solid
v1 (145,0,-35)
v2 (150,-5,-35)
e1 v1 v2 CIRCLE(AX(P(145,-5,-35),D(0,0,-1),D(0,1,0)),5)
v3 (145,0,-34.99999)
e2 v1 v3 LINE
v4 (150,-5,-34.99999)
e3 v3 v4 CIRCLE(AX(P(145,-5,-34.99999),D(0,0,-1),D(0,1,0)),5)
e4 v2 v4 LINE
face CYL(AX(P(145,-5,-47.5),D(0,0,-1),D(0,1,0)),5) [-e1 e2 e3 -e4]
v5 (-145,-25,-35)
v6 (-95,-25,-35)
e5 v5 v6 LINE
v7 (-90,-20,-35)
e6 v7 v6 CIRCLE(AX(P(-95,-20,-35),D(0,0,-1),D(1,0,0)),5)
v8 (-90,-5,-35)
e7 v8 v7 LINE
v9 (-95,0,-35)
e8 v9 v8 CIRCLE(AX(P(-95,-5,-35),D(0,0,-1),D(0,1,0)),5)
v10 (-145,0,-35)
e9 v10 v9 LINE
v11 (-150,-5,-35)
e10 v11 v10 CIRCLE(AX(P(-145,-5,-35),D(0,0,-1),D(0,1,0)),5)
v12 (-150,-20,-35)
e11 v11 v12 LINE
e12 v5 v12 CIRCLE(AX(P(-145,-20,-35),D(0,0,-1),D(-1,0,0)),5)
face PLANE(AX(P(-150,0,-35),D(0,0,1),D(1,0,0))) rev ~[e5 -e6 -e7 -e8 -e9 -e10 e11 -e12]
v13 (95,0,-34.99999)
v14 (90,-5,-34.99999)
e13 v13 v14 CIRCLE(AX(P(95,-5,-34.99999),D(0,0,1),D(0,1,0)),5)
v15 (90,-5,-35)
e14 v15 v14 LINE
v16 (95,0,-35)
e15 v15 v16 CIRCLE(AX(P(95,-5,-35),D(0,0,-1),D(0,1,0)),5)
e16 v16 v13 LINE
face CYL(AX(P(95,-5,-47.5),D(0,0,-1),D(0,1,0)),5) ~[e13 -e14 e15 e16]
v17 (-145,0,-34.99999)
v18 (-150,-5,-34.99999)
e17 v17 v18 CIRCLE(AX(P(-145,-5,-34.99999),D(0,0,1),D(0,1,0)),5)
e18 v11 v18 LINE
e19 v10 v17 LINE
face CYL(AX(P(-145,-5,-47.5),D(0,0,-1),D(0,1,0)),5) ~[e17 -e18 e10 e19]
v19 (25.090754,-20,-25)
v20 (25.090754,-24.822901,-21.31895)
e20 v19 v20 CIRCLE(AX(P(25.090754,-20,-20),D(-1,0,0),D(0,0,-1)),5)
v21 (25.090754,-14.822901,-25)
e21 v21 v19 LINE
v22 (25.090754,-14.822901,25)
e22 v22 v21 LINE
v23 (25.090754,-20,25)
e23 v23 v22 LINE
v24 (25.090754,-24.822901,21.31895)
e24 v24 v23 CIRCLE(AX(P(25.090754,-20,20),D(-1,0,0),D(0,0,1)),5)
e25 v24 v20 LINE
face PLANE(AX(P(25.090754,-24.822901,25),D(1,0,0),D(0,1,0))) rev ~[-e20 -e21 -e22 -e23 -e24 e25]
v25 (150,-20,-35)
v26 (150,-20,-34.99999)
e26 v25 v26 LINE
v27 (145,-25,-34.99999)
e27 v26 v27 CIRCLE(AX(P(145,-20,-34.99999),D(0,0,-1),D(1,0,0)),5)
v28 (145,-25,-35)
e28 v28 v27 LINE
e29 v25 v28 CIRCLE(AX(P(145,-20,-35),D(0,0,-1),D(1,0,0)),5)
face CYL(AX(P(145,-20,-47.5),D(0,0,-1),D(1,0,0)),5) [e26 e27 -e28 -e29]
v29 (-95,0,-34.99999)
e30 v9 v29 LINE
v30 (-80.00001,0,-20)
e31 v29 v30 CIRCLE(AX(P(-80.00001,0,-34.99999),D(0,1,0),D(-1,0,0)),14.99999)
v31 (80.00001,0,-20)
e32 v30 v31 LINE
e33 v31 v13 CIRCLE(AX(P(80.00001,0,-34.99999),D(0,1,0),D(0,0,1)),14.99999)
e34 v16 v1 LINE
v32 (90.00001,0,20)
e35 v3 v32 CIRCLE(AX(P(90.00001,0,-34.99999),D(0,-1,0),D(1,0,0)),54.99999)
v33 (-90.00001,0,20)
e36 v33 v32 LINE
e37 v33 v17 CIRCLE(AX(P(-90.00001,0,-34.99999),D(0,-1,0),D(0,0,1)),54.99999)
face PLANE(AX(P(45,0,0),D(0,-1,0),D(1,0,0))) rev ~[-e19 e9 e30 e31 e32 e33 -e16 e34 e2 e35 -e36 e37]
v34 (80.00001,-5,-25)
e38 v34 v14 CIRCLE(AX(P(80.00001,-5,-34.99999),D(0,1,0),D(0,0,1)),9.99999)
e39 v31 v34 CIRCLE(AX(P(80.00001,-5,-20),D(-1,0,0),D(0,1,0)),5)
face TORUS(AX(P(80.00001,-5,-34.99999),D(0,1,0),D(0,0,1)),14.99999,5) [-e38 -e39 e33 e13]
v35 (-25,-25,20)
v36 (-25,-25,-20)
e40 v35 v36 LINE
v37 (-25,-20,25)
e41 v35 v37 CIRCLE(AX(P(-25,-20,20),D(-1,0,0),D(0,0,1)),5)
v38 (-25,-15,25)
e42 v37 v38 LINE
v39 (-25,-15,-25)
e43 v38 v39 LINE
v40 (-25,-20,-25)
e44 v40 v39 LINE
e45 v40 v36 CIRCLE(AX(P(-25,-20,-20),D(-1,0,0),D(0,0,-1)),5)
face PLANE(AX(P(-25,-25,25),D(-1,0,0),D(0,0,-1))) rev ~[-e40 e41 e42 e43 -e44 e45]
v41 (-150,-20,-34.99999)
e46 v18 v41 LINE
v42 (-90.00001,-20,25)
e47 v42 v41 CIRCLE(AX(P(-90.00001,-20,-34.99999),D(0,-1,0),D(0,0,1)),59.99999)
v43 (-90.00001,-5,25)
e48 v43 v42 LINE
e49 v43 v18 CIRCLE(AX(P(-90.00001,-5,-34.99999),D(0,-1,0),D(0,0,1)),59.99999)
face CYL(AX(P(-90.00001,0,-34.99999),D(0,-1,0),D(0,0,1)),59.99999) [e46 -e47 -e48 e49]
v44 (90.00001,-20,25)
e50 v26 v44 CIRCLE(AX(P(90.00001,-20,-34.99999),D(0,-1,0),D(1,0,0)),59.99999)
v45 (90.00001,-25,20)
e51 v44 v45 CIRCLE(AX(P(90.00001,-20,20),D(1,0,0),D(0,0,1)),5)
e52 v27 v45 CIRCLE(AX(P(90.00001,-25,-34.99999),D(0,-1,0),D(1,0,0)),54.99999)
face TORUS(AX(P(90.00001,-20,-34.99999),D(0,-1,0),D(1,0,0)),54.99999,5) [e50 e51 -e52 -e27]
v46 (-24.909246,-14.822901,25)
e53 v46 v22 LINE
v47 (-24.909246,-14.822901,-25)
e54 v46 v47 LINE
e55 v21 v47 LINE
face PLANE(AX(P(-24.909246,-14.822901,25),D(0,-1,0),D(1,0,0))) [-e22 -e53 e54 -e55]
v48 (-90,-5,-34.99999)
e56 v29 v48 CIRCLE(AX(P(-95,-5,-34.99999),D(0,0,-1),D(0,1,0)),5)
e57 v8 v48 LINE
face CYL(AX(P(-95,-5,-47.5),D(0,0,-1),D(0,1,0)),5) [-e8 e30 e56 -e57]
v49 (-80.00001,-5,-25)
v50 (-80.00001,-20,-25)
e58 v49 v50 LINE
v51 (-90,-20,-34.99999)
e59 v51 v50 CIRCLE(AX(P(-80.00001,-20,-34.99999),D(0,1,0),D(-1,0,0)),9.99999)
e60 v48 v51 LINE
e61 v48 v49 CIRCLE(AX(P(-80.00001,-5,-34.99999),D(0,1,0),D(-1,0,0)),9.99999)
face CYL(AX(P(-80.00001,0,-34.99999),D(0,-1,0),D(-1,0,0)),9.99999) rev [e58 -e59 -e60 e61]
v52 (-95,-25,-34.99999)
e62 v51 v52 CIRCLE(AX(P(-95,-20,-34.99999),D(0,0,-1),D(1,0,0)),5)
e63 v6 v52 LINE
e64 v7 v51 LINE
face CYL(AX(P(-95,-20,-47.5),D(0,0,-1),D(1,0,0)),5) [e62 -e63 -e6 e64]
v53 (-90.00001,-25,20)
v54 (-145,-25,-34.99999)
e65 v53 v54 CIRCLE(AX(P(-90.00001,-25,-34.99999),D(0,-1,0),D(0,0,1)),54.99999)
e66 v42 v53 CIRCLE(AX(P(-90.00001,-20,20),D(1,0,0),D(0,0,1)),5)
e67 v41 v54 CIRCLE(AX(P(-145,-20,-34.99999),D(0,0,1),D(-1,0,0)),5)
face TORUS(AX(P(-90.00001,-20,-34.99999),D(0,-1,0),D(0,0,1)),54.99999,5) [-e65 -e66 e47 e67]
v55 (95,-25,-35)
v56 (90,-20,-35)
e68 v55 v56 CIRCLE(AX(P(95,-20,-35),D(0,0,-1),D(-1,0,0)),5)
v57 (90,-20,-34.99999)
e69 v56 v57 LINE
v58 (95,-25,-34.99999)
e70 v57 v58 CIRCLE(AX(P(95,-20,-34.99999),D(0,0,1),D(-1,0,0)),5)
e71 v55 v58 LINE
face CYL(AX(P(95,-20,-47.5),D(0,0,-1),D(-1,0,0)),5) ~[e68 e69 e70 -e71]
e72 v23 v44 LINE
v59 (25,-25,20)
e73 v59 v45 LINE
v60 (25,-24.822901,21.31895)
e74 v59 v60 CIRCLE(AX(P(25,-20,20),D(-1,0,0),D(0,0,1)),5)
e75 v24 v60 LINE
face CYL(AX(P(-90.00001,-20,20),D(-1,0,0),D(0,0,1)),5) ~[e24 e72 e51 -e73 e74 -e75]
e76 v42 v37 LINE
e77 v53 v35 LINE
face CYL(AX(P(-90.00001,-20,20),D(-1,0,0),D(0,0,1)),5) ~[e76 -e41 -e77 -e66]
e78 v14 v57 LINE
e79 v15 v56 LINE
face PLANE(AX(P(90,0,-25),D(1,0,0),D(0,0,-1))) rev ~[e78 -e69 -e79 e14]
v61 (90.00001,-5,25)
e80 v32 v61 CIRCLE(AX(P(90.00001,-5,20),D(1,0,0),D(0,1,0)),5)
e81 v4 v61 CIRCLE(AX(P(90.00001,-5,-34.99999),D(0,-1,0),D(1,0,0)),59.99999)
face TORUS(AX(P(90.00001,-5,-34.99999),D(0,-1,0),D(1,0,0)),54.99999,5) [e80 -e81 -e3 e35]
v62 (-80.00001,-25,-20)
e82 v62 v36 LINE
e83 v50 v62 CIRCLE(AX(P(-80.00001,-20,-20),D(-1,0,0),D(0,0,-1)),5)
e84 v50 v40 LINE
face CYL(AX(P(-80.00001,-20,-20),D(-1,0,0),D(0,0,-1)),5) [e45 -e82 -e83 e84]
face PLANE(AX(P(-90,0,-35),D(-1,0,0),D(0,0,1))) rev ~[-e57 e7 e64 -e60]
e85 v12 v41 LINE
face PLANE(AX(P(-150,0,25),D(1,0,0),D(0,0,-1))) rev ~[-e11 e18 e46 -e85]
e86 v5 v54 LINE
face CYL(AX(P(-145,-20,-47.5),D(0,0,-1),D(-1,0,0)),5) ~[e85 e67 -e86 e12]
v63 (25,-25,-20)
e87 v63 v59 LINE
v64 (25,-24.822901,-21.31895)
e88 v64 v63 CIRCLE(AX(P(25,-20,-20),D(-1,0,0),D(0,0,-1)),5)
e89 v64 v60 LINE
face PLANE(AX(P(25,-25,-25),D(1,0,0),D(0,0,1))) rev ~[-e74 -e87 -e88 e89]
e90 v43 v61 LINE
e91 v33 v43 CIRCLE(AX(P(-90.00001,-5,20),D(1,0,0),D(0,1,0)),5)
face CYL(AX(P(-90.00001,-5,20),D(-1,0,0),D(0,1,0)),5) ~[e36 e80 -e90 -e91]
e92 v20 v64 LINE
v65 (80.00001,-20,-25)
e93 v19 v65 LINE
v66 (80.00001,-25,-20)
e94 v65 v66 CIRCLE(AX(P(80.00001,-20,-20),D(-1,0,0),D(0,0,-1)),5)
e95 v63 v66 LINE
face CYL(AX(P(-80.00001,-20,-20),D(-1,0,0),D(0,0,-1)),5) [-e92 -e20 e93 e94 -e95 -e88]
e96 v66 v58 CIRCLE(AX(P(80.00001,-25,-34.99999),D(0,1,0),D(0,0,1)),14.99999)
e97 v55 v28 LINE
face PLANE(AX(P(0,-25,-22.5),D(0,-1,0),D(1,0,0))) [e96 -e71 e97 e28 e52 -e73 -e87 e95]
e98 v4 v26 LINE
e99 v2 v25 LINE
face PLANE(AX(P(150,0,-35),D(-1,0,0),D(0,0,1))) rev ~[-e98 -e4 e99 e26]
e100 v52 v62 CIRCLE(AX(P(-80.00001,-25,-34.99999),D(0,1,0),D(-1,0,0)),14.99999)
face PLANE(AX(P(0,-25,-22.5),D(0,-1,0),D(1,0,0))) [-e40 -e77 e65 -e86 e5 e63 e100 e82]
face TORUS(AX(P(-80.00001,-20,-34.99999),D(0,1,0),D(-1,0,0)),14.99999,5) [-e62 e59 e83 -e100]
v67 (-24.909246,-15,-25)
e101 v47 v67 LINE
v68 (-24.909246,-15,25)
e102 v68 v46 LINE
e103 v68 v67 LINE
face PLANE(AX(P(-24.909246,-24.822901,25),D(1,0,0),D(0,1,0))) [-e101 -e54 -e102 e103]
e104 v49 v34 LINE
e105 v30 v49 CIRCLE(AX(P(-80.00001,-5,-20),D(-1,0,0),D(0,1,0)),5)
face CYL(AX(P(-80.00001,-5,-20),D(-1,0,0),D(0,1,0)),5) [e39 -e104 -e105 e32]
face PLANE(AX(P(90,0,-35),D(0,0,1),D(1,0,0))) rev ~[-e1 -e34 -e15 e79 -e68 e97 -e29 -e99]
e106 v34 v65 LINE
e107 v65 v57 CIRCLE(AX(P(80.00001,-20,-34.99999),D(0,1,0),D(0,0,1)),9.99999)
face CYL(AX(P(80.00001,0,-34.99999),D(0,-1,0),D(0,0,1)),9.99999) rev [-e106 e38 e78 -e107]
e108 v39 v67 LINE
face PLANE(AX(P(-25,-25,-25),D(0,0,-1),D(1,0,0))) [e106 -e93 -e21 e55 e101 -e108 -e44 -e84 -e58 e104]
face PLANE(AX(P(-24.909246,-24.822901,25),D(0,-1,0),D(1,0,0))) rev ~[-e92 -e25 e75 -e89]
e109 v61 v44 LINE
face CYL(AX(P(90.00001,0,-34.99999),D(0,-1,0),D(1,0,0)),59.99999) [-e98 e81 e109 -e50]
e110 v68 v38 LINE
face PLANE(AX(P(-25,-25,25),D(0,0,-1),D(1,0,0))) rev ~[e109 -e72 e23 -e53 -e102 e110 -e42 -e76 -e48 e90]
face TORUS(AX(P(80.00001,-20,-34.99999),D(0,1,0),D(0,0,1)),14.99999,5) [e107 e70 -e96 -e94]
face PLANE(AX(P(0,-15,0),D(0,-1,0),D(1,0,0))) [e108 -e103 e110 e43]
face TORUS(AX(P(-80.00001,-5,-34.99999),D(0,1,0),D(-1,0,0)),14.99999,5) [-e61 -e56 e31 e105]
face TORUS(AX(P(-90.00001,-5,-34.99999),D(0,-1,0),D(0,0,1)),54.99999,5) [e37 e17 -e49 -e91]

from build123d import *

# Parameters (mm, degrees)
F0_W         = 90
F0_H         = 50
F1_DEPTH     = 25
F2_R         = 59.99999
F3_R         = 9.99999
F4_R         = 9.99999
F5_R         = 59.99999
F6_T1_DEPTH  = 12.50001
F6_T3_DEPTH  = 180.00002
F6_T6_ANGLE  = 90
F6_T8_ANGLE  = 90
F7_T1_DEPTH  = 12.50001
F7_T3_DEPTH  = 180.00002
F7_T6_ANGLE  = 90
F7_T8_ANGLE  = 90
F8_T1_DEPTH  = 160.00002
F8_T3_DEPTH  = 12.50001
F8_T6_ANGLE  = 90
F8_T8_ANGLE  = 90
F8_T10_ANGLE = 90
F8_T12_ANGLE = 90
F9_W         = 50
F9_H         = 5
F9_H_2       = 40
F10_DEPTH    = 10
F13_W        = 50
F13_H        = 10
F14_DEPTH    = 60.001
F16_DEPTH    = 10


# Not quite as in the source:
# - a fillet or chamfer that OpenCascade refuses, or shapes differently, is made with other operations: its cross-section is extruded or revolved along the edge and cut away or added
# - a fillet or chamfer is up to 0.001 mm smaller than in the source, because OpenCascade refuses the exact size


with BuildPart() as f1:
    # F0 (on Front) → F1 (new body)
    with BuildSketch(Plane.XZ):
        with Locations((45, 0)):
            Rectangle(F0_W, F0_H)
        Polygon((150, 25), (90, 25), (90, -25), (90, -35), (150, -35), align=None)
        with Locations((-45, 0)):
            Rectangle(F0_W, F0_H)
        Polygon((-90, -25), (-90, 25), (-150, 25), (-150, -35), (-90, -35), align=None)
    extrude(amount=F1_DEPTH)

    # F2 (radius 60 in the source; OpenCascade refuses exactly that, so slightly less here)
    f2_edges = [f1.edges().sort_by_distance(p)[0] for p in [
        (-150, -12.5, 25),
    ]]
    fillet(f2_edges, radius=F2_R)

    # F3 (radius 10 in the source; OpenCascade refuses exactly that, so slightly less here)
    f3_edges = [f1.edges().sort_by_distance(p)[0] for p in [
        (-90, -12.5, -25),
    ]]
    fillet(f3_edges, radius=F3_R)

    # F4 (radius 10 in the source; OpenCascade refuses exactly that, so slightly less here)
    f4_edges = [f1.edges().sort_by_distance(p)[0] for p in [
        (90, -12.5, -25),
    ]]
    fillet(f4_edges, radius=F4_R)

    # F5 (radius 60 in the source; OpenCascade refuses exactly that, so slightly less here)
    f5_edges = [f1.edges().sort_by_distance(p)[0] for p in [
        (150, -12.5, 25),
    ]]
    fillet(f5_edges, radius=F5_R)

    # F6: fillet of radius 5 on 1 edges, made by hand

    # F6_s2 → F6_t1 (cut)
    with BuildSketch(Plane.XY.offset(-47.5)):
        with BuildLine():
            ThreePointArc((150, -20), (148.5355339059, -23.5355339059), (145, -25))
            Line((145, -25), (150, -25))
            Line((150, -25), (150, -20))
        make_face()
        with BuildLine():
            ThreePointArc((-150, -20), (-148.5355339059, -23.5355339059), (-145, -25))
            Line((-145, -25), (-150, -25))
            Line((-150, -25), (-150, -20))
        make_face()
    extrude(amount=F6_T1_DEPTH, mode=Mode.SUBTRACT)

    # F6_s4 → F6_t3 (cut)
    with BuildSketch(Plane.YZ.offset(-90.00001)):
        with BuildLine():
            ThreePointArc((-20, 25), (-23.5355339059, 23.5355339059), (-25, 20))
            Line((-25, 20), (-25, 25))
            Line((-25, 25), (-20, 25))
        make_face()
    extrude(amount=F6_T3_DEPTH, mode=Mode.SUBTRACT)

    # F6_s5 → F6_t6 (revolve, cut)
    with BuildSketch(Plane.XY.offset(-34.99999)):
        with BuildLine():
            ThreePointArc((150, -20), (148.5355339059, -23.5355339059), (145, -25))
            Line((145, -25), (150, -25))
            Line((150, -25), (150, -20))
        make_face()
    revolve(axis=Axis((90.00001, -25, -34.99999), (0, -1, 0)), revolution_arc=F6_T6_ANGLE, mode=Mode.SUBTRACT)

    # F6_s7 → F6_t8 (revolve, cut)
    with BuildSketch(Plane.YZ.offset(-90.00001)):
        with BuildLine():
            ThreePointArc((-20, 25), (-23.5355339059, 23.5355339059), (-25, 20))
            Line((-25, 20), (-25, 25))
            Line((-25, 25), (-20, 25))
        make_face()
    revolve(axis=Axis((-90.00001, -25, -34.99999), (0, -1, 0)), revolution_arc=F6_T8_ANGLE, mode=Mode.SUBTRACT)

    # F7: fillet of radius 5 on 1 edges, made by hand

    # F7_s2 → F7_t1 (cut)
    with BuildSketch(Plane.XY.offset(-47.5)):
        with BuildLine():
            ThreePointArc((145, 0), (148.5355339059, -1.4644660941), (150, -5))
            Line((150, -5), (150, 0))
            Line((150, 0), (145, 0))
        make_face()
        with BuildLine():
            ThreePointArc((-145, 0), (-148.5355339059, -1.4644660941), (-150, -5))
            Line((-150, -5), (-150, 0))
            Line((-150, 0), (-145, 0))
        make_face()
    extrude(amount=F7_T1_DEPTH, mode=Mode.SUBTRACT)

    # F7_s4 → F7_t3 (cut)
    with BuildSketch(Plane.YZ.offset(-90.00001)):
        with BuildLine():
            ThreePointArc((0, 20), (-1.4644660941, 23.5355339059), (-5, 25))
            Line((-5, 25), (0, 25))
            Line((0, 25), (0, 20))
        make_face()
    extrude(amount=F7_T3_DEPTH, mode=Mode.SUBTRACT)

    # F7_s5 → F7_t6 (revolve, cut)
    with BuildSketch(Plane.XY.offset(-34.99999)):
        with BuildLine():
            ThreePointArc((145, 0), (148.5355339059, -1.4644660941), (150, -5))
            Line((150, -5), (150, 0))
            Line((150, 0), (145, 0))
        make_face()
    revolve(axis=Axis((90.00001, 0, -34.99999), (0, -1, 0)), revolution_arc=F7_T6_ANGLE, mode=Mode.SUBTRACT)

    # F7_s7 → F7_t8 (revolve, cut)
    with BuildSketch(Plane.YZ.offset(-90.00001)):
        with BuildLine():
            ThreePointArc((0, 20), (-1.4644660941, 23.5355339059), (-5, 25))
            Line((-5, 25), (0, 25))
            Line((0, 25), (0, 20))
        make_face()
    revolve(axis=Axis((-90.00001, 0, -34.99999), (0, -1, 0)), revolution_arc=F7_T8_ANGLE, mode=Mode.SUBTRACT)

    # F8: fillet of radius 5 on 2 edges, made by hand

    # F8_s2 → F8_t1 (cut)
    with BuildSketch(Plane.YZ.offset(-80.00001)):
        with BuildLine():
            ThreePointArc((-20, -25), (-23.5355339059, -23.5355339059), (-25, -20))
            Line((-25, -20), (-25, -25))
            Line((-25, -25), (-20, -25))
        make_face()
        with BuildLine():
            ThreePointArc((0, -20), (-1.4644660941, -23.5355339059), (-5, -25))
            Line((-5, -25), (0, -25))
            Line((0, -25), (0, -20))
        make_face()
    extrude(amount=F8_T1_DEPTH, mode=Mode.SUBTRACT)

    # F8_s4 → F8_t3 (cut)
    with BuildSketch(Plane.XY.offset(-47.5)):
        with BuildLine():
            ThreePointArc((90, -20), (91.4644660941, -23.5355339059), (95, -25))
            Line((95, -25), (90, -25))
            Line((90, -25), (90, -20))
        make_face()
        with BuildLine():
            ThreePointArc((-90, -20), (-91.4644660941, -23.5355339059), (-95, -25))
            Line((-95, -25), (-90, -25))
            Line((-90, -25), (-90, -20))
        make_face()
        with BuildLine():
            ThreePointArc((95, 0), (91.4644660941, -1.4644660941), (90, -5))
            Line((90, -5), (90, 0))
            Line((90, 0), (95, 0))
        make_face()
        with BuildLine():
            ThreePointArc((-95, 0), (-91.4644660941, -1.4644660941), (-90, -5))
            Line((-90, -5), (-90, 0))
            Line((-90, 0), (-95, 0))
        make_face()
    extrude(amount=F8_T3_DEPTH, mode=Mode.SUBTRACT)

    # F8_s5 → F8_t6 (revolve, cut)
    with BuildSketch(Plane.YZ.offset(80.00001)):
        with BuildLine():
            ThreePointArc((0, -20), (-1.4644660941, -23.5355339059), (-5, -25))
            Line((-5, -25), (0, -25))
            Line((0, -25), (0, -20))
        make_face()
    revolve(axis=Axis((80.00001, 0, -34.99999), (0, 1, 0)), revolution_arc=F8_T6_ANGLE, mode=Mode.SUBTRACT)

    # F8_s7 → F8_t8 (revolve, cut)
    with BuildSketch(Plane.XY.offset(-34.99999)):
        with BuildLine():
            ThreePointArc((-90, -20), (-91.4644660941, -23.5355339059), (-95, -25))
            Line((-95, -25), (-90, -25))
            Line((-90, -25), (-90, -20))
        make_face()
    revolve(axis=Axis((-80.00001, -25, -34.99999), (0, 1, 0)), revolution_arc=F8_T8_ANGLE, mode=Mode.SUBTRACT)

    # F8_s9 → F8_t10 (revolve, cut)
    with BuildSketch(Plane.YZ.offset(80.00001)):
        with BuildLine():
            ThreePointArc((-20, -25), (-23.5355339059, -23.5355339059), (-25, -20))
            Line((-25, -20), (-25, -25))
            Line((-25, -25), (-20, -25))
        make_face()
    revolve(axis=Axis((80.00001, -25, -34.99999), (0, 1, 0)), revolution_arc=F8_T10_ANGLE, mode=Mode.SUBTRACT)

    # F8_s11 → F8_t12 (revolve, cut)
    with BuildSketch(Plane.XY.offset(-34.99999)):
        with BuildLine():
            ThreePointArc((-95, 0), (-91.4644660941, -1.4644660941), (-90, -5))
            Line((-90, -5), (-90, 0))
            Line((-90, 0), (-95, 0))
        make_face()
    revolve(axis=Axis((-80.00001, 0, -34.99999), (0, 1, 0)), revolution_arc=F8_T12_ANGLE, mode=Mode.SUBTRACT)

    # F9 (on face) → F10 (join)
    with BuildSketch(Plane.XZ.offset(25)):
        with Locations((0, -22.5)):
            Rectangle(F9_W, F9_H)
        with Locations((0, 22.5)):
            Rectangle(F9_W, F9_H)
        Rectangle(F9_W, F9_H_2)
    extrude(amount=-F10_DEPTH)

    # F13 (on face) → F14 (cut, through all)
    with BuildSketch(Plane.XY.offset(25)):
        with Locations((0.0907536596, -19.8229007973)):
            Rectangle(F13_W, F13_H)
    extrude(amount=-F14_DEPTH, mode=Mode.SUBTRACT)

    # F15 (on face) → F16 (cut)
    with BuildSketch(Plane.XZ.offset(25)):
        Polygon((25, 25), (-25, 25), (-25, 20), (-25, -20), (-25, -25), (25, -25), (25, -20), (25, 20), align=None)
    extrude(amount=-F16_DEPTH, mode=Mode.SUBTRACT)


solid = f1.part
